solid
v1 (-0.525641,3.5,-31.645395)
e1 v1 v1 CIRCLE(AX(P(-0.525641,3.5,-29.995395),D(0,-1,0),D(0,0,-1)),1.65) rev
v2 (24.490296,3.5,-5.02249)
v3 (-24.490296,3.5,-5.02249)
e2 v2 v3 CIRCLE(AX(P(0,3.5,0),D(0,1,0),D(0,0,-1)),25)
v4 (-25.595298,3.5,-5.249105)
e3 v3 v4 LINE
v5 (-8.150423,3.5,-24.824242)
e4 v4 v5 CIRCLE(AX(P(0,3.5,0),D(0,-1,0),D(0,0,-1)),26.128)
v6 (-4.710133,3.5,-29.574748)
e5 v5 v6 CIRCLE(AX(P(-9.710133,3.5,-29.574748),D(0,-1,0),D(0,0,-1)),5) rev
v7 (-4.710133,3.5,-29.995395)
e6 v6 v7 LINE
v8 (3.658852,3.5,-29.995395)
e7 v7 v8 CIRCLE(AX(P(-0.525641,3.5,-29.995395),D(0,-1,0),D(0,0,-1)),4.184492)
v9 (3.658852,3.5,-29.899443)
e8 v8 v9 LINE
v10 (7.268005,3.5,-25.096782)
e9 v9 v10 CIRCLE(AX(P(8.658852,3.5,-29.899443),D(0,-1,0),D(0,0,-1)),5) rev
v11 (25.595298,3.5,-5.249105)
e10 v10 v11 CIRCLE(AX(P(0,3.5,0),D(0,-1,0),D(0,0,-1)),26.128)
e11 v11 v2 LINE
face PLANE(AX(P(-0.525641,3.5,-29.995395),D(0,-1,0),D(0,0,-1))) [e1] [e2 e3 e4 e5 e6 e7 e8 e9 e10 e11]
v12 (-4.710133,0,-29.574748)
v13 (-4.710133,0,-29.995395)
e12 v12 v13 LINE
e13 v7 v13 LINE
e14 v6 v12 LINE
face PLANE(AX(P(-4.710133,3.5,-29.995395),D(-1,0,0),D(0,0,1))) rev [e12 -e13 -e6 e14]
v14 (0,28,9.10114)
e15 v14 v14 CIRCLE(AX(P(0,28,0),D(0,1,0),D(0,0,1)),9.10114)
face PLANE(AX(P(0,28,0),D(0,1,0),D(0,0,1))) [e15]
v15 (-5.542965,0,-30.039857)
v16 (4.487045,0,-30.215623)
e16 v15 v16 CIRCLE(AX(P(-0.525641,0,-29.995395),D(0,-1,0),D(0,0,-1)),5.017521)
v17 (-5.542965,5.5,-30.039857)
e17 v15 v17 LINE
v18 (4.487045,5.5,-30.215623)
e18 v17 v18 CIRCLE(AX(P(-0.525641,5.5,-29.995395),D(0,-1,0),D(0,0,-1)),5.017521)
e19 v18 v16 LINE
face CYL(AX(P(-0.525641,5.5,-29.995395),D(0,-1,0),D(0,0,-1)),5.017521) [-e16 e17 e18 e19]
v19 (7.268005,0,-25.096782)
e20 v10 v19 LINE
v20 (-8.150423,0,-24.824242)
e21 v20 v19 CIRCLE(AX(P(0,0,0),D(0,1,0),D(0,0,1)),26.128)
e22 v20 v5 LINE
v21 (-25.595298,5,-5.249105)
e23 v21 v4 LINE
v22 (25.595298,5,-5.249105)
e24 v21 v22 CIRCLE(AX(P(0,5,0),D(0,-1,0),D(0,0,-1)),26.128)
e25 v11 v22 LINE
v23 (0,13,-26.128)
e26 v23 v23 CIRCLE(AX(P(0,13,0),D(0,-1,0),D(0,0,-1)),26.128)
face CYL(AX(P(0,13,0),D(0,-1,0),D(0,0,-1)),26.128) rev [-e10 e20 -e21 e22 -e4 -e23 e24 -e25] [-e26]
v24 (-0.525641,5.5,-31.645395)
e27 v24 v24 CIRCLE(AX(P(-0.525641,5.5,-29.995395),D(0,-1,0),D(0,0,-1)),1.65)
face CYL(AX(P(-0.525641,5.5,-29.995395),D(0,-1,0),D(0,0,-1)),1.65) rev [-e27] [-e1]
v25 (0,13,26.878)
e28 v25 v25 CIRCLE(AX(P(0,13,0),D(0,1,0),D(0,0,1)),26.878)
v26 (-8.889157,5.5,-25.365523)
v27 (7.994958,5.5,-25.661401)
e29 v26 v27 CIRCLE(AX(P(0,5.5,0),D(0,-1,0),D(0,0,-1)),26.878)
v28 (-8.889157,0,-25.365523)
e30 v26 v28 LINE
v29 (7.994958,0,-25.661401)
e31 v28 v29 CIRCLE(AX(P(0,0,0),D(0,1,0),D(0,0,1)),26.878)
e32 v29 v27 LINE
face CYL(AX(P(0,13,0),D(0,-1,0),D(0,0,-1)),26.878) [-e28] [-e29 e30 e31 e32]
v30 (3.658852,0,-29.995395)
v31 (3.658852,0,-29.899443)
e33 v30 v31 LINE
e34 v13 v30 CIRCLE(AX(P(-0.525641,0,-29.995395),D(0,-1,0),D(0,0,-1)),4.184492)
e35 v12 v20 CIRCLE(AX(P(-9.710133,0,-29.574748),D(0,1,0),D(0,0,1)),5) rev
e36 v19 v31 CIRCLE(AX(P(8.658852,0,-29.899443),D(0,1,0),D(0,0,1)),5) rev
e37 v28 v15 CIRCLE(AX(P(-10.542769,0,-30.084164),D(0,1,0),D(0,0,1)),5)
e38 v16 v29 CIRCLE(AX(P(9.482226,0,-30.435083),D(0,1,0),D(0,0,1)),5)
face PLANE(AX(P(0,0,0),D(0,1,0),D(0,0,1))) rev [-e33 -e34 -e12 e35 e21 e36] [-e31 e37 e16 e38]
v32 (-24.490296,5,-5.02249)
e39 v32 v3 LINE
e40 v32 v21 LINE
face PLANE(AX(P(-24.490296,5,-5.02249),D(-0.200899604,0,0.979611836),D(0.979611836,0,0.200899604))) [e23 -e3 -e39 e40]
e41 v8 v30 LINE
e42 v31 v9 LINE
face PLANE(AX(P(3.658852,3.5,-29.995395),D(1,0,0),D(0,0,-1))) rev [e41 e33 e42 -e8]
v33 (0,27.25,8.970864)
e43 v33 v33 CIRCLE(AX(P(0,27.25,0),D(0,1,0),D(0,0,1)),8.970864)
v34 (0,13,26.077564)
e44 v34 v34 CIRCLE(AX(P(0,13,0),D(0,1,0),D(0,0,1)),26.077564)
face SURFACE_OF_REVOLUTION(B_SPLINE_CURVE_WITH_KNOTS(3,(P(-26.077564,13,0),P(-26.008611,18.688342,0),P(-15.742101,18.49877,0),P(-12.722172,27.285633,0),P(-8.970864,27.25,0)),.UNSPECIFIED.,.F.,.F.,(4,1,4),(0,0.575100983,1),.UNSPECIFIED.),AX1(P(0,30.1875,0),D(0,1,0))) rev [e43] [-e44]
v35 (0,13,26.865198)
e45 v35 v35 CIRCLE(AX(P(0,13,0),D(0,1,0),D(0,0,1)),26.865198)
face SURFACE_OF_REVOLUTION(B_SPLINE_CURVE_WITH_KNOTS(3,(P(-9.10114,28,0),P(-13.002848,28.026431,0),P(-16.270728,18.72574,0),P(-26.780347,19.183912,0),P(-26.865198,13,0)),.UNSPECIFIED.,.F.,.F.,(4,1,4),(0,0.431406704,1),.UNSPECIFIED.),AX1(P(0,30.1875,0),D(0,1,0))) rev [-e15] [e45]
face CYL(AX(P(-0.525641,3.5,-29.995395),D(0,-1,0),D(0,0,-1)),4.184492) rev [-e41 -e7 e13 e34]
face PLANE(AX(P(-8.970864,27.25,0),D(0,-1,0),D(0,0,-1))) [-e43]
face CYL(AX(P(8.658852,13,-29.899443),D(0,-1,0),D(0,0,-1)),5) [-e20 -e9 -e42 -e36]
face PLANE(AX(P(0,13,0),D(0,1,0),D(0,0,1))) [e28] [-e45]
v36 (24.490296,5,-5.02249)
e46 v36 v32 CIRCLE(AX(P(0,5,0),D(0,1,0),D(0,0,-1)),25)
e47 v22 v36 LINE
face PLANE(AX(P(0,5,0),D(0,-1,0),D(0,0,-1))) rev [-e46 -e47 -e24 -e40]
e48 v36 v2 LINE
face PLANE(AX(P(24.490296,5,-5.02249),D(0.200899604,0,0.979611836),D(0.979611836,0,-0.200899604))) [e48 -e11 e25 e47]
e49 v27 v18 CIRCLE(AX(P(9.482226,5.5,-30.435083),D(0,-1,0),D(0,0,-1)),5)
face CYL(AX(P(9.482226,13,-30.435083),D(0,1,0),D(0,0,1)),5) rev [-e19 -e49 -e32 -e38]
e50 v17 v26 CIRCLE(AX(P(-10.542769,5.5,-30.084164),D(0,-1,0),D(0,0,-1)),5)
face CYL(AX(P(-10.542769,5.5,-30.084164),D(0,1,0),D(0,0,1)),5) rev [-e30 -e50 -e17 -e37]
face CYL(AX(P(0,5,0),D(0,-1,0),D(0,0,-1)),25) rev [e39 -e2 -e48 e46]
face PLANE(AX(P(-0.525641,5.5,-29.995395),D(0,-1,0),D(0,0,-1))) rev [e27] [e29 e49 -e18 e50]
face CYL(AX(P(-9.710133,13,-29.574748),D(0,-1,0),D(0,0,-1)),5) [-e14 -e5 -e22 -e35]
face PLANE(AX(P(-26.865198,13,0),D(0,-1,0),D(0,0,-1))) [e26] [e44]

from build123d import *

# Parameters (mm, degrees)
SKETCH3_R           = 26.878
SKETCH3_R_2         = 26.128
BOSS_EXTRUDE1_DEPTH = 13
SKETCH5_R           = 1.65
BOSS_EXTRUDE4_DEPTH = 5.5
CUT_EXTRUDE1_DEPTH  = 3.5
BOSS_EXTRUDE5_START = -3.5
BOSS_EXTRUDE5_DEPTH = 1.5
FILLET1_DEPTH       = 3.5
FILLET1_2_DEPTH     = 5.5
FILLET1_START       = 3.5
FILLET1_3_DEPTH     = 2


with BuildPart() as part:
    # Sketch3 → Boss-Extrude1 (new body)
    with BuildSketch(Plane(origin=(0, 0, 0), x_dir=(1, 0, 0), z_dir=(0, 1, 0))):
        with Locations(Location((0, 0, 0), (0, 0, 90))):
            Circle(SKETCH3_R)
        with Locations(Location((0, 0, 0), (0, 0, 90))):
            Circle(SKETCH3_R_2, mode=Mode.SUBTRACT)
    extrude(amount=BOSS_EXTRUDE1_DEPTH)

    # Sketch5 → Boss-Extrude4 (add)
    with BuildSketch(Plane.XZ):
        with BuildLine():
            Line((-5.543162198, -29.995394675), (-5.543162198, -26.300194616))
            ThreePointArc((-5.543162198, -26.300194616), (-0.534858171, -26.863033142), (4.491880525, -26.499997988))
            Line((4.491880525, -26.499997988), (4.491880525, -29.995394675))
            ThreePointArc((4.491880525, -29.995394675), (-0.525640836, -35.012916036), (-5.543162198, -29.995394675))
        make_face()
        with Locations(Location((-0.525640836, -29.995394675, 0), (0, 0, 270))):
            Circle(SKETCH5_R, mode=Mode.SUBTRACT)
    extrude(amount=-BOSS_EXTRUDE4_DEPTH)

    # Sketch6 → Cut-Extrude1 (cut)
    with BuildSketch(Plane(origin=(0, 0, 0), x_dir=(-1, 0, 0), z_dir=(0, -1, 0))):
        with BuildLine():
            Line((4.710133197, 29.995394675), (4.710133197, 25.699942204))
            ThreePointArc((4.710133197, 25.699942204), (0.530383369, 26.096098926), (-3.658851524, 25.81760336))
            Line((-3.658851524, 25.81760336), (-3.658851524, 29.995394675))
            ThreePointArc((-3.658851524, 29.995394675), (0.525640836, 34.179887036), (4.710133197, 29.995394675))
        make_face()
    extrude(amount=-CUT_EXTRUDE1_DEPTH, mode=Mode.SUBTRACT)

    # Sketch8 → Boss-Extrude5 (add)
    with BuildSketch(Plane.XZ.offset(BOSS_EXTRUDE5_START)):
        with BuildLine():
            Line((-24.490295897, -5.022490106), (-25.599662863, -5.25))
            ThreePointArc((-25.599662863, -5.25), (0, -26.132455658), (25.599662863, -5.25))
            Line((25.599662863, -5.25), (24.490295897, -5.022490106))
            ThreePointArc((24.490295897, -5.022490106), (0, -25), (-24.490295897, -5.022490106))
        make_face()
    extrude(amount=-BOSS_EXTRUDE5_DEPTH)

    # Sketch9 → Revolve2 (revolve)
    with BuildSketch(Plane.XY, mode=Mode.PRIVATE) as revolve2_sk:
        with BuildLine():
            Line((0, 28), (-9.101139649, 28))
            add(Edge.make_bspline(
                [(-26.865197812, 13), (-26.780347086, 19.183911548), (-16.270727798, 18.725740026), (-13.002848085, 28.026430598), (-9.101139649, 28)],
                knots=[0, 0, 0, 0, 0.568593296, 1, 1, 1, 1], degree=3))
            Line((-26.865197812, 13), (-26.077563706, 13))
            add(Edge.make_bspline(
                [(-26.077563706, 13), (-26.008610768, 18.688342048), (-15.742101247, 18.498770299), (-12.722171974, 27.285632832), (-8.970863985, 27.25)],
                knots=[0, 0, 0, 0, 0.575100983, 1, 1, 1, 1], degree=3))
            Line((-8.970863985, 27.25), (0, 27.25))
            Line((0, 27.25), (0, 28))
        make_face()
    revolve(revolve2_sk.sketch.rotate(Axis((0, 30.1875, 0), (0, -1, 0)), 99.620474841), axis=Axis((0, 30.1875, 0), (0, -1, 0)))

    # Fillet1: read off the stored shape, not the designer's step
    # Fillet1 outline → Fillet1 (cut)
    with BuildSketch(Plane(origin=(0, 0, 0), x_dir=(1, 0, 0), z_dir=(0, 1, 0))):
        with BuildLine():
            ThreePointArc((3.658851524, 25.870546757), (5.477109504, 25.547478456), (7.268005417, 25.096782289))
            ThreePointArc((7.268005417, 25.096782289), (6.09952046, 25.604116819), (5.097161214, 26.390260165))
            ThreePointArc((5.097161214, 26.390260165), (4.794834821, 26.446860741), (4.491880525, 26.499997988))
            Line((4.491880525, 26.499997988), (4.491880525, 27.136047571))
            ThreePointArc((4.491880525, 27.136047571), (3.87163652, 28.45633062), (3.658851524, 29.899442708))
            Line((3.658851524, 29.899442708), (3.658851524, 25.870546757))
        make_face()
        with BuildLine():
            ThreePointArc((-6.026648148, 26.19363274), (-7.000597737, 25.37255563), (-8.150422776, 24.824242034))
            ThreePointArc((-8.150422776, 24.824242034), (-6.445167778, 25.320588388), (-4.710133197, 25.699942204))
            Line((-4.710133197, 25.699942204), (-4.710133197, 29.574747629))
            ThreePointArc((-4.710133197, 29.574747629), (-4.922918193, 28.131635539), (-5.543162198, 26.81135249))
            Line((-5.543162198, 26.81135249), (-5.543162198, 26.300194616))
            ThreePointArc((-5.543162198, 26.300194616), (-5.785150535, 26.248026922), (-6.026648148, 26.19363274))
        make_face()
    extrude(amount=FILLET1_DEPTH, mode=Mode.SUBTRACT)

    # Fillet1 2 outline → Fillet1 2 (add)
    with BuildSketch(Plane(origin=(0, 0, 0), x_dir=(1, 0, 0), z_dir=(0, 1, 0))):
        with BuildLine():
            ThreePointArc((4.491880525, 27.136047571), (4.776571122, 26.748585862), (5.097161214, 26.390260165))
            ThreePointArc((5.097161214, 26.390260165), (6.556196133, 26.066130826), (7.994958398, 25.661401447))
            ThreePointArc((7.994958398, 25.661401447), (5.52106858, 27.38398005), (4.487045069, 30.215623257))
            ThreePointArc((4.487045069, 30.215623257), (4.490671515, 30.105535505), (4.491880525, 29.995394675))
            Line((4.491880525, 29.995394675), (4.491880525, 27.136047571))
        make_face()
        with BuildLine():
            ThreePointArc((-8.889156848, 25.365523344), (-7.469387589, 25.819278321), (-6.026648148, 26.19363274))
            ThreePointArc((-6.026648148, 26.19363274), (-5.772772474, 26.492996416), (-5.543162198, 26.81135249))
            Line((-5.543162198, 26.81135249), (-5.543162198, 29.995394675))
            ThreePointArc((-5.543162198, 29.995394675), (-5.543112947, 30.017625977), (-5.542965196, 30.039856842))
            ThreePointArc((-5.542965196, 30.039856842), (-6.477140566, 27.173722816), (-8.889156848, 25.365523344))
        make_face()
    extrude(amount=FILLET1_2_DEPTH)

    # Fillet1 3 outline → Fillet1 3 (add)
    with BuildSketch(Plane(origin=(0, 0, 0), x_dir=(1, 0, 0), z_dir=(0, 1, 0)).offset(FILLET1_START)):
        with BuildLine():
            ThreePointArc((4.491880525, 26.499997988), (4.794834821, 26.446860741), (5.097161214, 26.390260165))
            ThreePointArc((5.097161214, 26.390260165), (4.776571122, 26.748585862), (4.491880525, 27.136047571))
            Line((4.491880525, 27.136047571), (4.491880525, 26.499997988))
        make_face()
        with BuildLine():
            ThreePointArc((-5.543162198, 26.81135249), (-5.772772474, 26.492996416), (-6.026648148, 26.19363274))
            ThreePointArc((-6.026648148, 26.19363274), (-5.785150535, 26.248026922), (-5.543162198, 26.300194616))
            Line((-5.543162198, 26.300194616), (-5.543162198, 26.81135249))
        make_face()
    extrude(amount=FILLET1_3_DEPTH)


solid = part.part
